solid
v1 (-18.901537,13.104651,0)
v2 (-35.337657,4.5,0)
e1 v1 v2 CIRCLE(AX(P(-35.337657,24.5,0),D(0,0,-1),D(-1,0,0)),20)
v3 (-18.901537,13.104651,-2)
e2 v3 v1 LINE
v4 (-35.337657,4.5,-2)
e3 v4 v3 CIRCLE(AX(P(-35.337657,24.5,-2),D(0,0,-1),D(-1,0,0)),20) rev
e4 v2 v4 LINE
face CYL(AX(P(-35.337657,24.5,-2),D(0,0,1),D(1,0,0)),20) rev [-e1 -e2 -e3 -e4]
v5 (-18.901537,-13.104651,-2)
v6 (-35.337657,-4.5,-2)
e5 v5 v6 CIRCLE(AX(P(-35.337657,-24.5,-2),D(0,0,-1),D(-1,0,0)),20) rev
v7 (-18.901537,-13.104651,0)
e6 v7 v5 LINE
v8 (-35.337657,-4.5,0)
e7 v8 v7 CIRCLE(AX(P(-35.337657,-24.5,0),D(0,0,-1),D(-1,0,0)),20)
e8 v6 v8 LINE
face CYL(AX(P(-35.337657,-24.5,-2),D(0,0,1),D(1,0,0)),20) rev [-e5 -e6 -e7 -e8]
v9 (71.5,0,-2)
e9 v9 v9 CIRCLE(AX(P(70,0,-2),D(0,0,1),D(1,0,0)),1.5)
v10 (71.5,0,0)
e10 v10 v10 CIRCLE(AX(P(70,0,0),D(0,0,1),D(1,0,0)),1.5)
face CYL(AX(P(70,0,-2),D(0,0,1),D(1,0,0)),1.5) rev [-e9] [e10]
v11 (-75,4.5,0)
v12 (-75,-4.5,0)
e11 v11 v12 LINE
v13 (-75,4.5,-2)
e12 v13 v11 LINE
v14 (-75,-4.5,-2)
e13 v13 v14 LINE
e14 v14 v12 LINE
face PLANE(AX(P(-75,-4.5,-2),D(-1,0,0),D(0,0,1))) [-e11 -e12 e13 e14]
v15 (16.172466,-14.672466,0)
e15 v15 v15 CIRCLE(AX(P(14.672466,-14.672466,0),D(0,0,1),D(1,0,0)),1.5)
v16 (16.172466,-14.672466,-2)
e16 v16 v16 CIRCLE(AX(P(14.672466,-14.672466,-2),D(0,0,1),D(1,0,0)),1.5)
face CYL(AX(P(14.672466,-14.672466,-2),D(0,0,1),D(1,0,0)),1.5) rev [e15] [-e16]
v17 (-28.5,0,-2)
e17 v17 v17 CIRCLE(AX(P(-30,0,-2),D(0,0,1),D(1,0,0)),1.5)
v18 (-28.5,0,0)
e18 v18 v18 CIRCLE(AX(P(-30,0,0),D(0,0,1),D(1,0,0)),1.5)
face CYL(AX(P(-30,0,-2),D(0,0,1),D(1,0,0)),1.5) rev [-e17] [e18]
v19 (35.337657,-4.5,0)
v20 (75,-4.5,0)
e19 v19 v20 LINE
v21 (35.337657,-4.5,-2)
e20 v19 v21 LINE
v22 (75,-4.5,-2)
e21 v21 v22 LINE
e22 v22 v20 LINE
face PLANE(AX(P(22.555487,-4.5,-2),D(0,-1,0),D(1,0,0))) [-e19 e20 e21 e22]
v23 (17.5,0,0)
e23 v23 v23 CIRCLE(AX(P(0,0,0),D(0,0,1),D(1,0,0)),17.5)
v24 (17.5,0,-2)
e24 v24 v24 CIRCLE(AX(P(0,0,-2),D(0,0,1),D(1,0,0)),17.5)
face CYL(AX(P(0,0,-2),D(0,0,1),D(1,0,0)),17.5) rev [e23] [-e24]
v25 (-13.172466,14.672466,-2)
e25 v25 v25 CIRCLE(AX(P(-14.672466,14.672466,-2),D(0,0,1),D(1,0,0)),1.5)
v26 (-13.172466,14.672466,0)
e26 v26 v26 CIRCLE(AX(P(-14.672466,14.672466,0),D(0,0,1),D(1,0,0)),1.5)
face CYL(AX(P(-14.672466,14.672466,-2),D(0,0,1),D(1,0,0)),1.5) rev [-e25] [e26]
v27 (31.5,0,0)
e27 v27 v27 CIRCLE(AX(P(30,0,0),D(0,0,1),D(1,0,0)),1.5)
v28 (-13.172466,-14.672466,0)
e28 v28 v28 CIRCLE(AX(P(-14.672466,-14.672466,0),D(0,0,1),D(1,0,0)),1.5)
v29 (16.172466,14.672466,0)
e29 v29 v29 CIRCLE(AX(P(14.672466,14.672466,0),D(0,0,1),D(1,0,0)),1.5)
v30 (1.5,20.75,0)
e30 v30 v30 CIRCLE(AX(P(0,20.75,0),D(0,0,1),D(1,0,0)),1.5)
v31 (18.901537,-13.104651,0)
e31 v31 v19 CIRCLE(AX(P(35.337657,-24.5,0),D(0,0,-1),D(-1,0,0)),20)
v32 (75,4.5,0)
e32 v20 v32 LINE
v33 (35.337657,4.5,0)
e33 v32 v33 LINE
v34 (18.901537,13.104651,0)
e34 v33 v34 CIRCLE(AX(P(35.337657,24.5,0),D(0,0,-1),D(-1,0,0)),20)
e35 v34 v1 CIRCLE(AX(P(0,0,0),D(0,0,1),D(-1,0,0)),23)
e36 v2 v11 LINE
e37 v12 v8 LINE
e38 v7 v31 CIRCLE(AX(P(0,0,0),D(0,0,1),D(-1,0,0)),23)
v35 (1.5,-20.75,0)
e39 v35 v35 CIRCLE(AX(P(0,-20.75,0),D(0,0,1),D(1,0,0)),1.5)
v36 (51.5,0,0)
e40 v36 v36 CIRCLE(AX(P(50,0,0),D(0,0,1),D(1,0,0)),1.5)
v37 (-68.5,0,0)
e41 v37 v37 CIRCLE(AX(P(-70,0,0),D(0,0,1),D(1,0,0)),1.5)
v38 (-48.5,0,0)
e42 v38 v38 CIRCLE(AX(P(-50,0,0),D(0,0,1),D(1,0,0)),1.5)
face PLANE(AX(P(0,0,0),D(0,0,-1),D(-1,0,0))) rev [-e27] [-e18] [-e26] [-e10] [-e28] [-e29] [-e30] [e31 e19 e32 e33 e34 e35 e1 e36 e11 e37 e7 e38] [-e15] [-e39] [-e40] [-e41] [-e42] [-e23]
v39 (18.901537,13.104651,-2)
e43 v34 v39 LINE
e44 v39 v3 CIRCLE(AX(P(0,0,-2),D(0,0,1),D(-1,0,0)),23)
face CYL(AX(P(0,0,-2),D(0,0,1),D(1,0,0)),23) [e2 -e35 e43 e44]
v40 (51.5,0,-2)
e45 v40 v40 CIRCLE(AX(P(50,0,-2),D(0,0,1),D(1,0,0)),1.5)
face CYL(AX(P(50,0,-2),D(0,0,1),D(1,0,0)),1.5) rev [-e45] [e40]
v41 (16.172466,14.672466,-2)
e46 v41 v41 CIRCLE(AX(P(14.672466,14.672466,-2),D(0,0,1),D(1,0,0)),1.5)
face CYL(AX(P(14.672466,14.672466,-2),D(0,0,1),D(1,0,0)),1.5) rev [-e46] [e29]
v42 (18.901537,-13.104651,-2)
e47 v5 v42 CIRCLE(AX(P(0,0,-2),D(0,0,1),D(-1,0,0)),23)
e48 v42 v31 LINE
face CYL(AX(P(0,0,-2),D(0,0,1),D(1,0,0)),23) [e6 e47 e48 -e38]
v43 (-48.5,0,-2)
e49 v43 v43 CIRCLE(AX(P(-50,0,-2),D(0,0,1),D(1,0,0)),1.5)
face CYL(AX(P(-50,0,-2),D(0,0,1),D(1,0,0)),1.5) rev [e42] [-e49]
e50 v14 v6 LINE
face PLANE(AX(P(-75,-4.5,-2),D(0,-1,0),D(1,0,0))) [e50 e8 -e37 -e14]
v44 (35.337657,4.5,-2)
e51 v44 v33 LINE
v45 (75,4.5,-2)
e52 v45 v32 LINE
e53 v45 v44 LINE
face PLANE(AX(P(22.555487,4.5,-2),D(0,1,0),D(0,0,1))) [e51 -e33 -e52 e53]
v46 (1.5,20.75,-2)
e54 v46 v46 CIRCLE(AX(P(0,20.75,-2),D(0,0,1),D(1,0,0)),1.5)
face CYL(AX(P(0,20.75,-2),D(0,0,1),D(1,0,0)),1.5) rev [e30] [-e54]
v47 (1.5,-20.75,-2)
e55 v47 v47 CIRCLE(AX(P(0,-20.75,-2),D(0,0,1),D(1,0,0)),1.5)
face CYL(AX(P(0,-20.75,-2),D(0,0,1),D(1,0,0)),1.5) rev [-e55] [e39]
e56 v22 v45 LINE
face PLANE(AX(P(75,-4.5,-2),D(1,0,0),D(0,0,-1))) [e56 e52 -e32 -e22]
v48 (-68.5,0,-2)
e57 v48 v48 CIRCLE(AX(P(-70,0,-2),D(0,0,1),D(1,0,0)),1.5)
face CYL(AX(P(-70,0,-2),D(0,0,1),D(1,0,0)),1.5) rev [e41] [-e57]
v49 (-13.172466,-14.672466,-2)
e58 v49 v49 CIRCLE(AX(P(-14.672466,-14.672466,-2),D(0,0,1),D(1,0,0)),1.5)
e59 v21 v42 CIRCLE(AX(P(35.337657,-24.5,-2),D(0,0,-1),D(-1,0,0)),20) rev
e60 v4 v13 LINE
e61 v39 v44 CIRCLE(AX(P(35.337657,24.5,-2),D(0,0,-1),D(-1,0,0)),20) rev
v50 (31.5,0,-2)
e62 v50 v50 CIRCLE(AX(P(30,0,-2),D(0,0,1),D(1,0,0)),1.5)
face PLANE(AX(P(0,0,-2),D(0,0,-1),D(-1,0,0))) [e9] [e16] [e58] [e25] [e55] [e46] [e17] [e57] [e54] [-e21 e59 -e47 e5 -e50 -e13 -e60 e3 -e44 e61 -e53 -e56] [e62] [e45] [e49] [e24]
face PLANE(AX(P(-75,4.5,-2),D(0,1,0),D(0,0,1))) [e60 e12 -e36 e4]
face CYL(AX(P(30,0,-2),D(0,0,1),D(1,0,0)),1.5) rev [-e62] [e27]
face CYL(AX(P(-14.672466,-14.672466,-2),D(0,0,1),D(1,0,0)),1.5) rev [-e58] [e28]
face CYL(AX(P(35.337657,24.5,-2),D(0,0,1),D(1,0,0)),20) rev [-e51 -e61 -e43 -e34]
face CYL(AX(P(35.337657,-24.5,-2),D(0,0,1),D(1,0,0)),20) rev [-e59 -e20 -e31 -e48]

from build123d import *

# Parameters (mm, degrees)
SKETCH_1_R             = 1.5
SKETCH_1_R_2           = 17.5
SM_BASE_FLANGE_1_DEPTH = 2
FILLET_1_R             = 20


# Sheet-metal steps are written as plain solids
with BuildPart() as part:
    # Sketch 1 → 基体-法兰1 (new body)
    with BuildSketch(Plane.XY):
        with BuildLine():
            Line((22.555487137, 4.5), (75, 4.5))
            Line((75, 4.5), (75, -4.5))
            Line((75, -4.5), (22.555487137, -4.5))
            ThreePointArc((22.555487137, -4.5), (0, -23), (-22.555487137, -4.5))
            Line((-22.555487137, -4.5), (-75, -4.5))
            Line((-75, -4.5), (-75, 4.5))
            Line((-75, 4.5), (-22.555487137, 4.5))
            ThreePointArc((-22.555487137, 4.5), (0, 23), (22.555487137, 4.5))
        make_face()
        with Locations((0, 20.75)):
            Circle(SKETCH_1_R, mode=Mode.SUBTRACT)
        with Locations((14.67246571, 14.67246571)):
            Circle(SKETCH_1_R, mode=Mode.SUBTRACT)
        with Locations((14.67246571, -14.67246571)):
            Circle(SKETCH_1_R, mode=Mode.SUBTRACT)
        with Locations((0, -20.75)):
            Circle(SKETCH_1_R, mode=Mode.SUBTRACT)
        with Locations((-14.67246571, -14.67246571)):
            Circle(SKETCH_1_R, mode=Mode.SUBTRACT)
        with Locations((-14.67246571, 14.67246571)):
            Circle(SKETCH_1_R, mode=Mode.SUBTRACT)
        Circle(SKETCH_1_R_2, mode=Mode.SUBTRACT)
        with Locations((-70, 0)):
            Circle(SKETCH_1_R, mode=Mode.SUBTRACT)
        with Locations((-50, 0)):
            Circle(SKETCH_1_R, mode=Mode.SUBTRACT)
        with Locations((-30, 0)):
            Circle(SKETCH_1_R, mode=Mode.SUBTRACT)
        with Locations((30, 0)):
            Circle(SKETCH_1_R, mode=Mode.SUBTRACT)
        with Locations((50, 0)):
            Circle(SKETCH_1_R, mode=Mode.SUBTRACT)
        with Locations((70, 0)):
            Circle(SKETCH_1_R, mode=Mode.SUBTRACT)
    extrude(amount=-SM_BASE_FLANGE_1_DEPTH)

    # 圆角1
    fillet_1_edges = [part.edges().sort_by_distance(p)[0] for p in [
        (22.555487137, -4.5, -1),
        (-22.555487137, -4.5, -1),
        (-22.555487137, 4.5, -1),
        (22.555487137, 4.5, -1),
    ]]
    fillet(fillet_1_edges, radius=FILLET_1_R)


solid = part.part
